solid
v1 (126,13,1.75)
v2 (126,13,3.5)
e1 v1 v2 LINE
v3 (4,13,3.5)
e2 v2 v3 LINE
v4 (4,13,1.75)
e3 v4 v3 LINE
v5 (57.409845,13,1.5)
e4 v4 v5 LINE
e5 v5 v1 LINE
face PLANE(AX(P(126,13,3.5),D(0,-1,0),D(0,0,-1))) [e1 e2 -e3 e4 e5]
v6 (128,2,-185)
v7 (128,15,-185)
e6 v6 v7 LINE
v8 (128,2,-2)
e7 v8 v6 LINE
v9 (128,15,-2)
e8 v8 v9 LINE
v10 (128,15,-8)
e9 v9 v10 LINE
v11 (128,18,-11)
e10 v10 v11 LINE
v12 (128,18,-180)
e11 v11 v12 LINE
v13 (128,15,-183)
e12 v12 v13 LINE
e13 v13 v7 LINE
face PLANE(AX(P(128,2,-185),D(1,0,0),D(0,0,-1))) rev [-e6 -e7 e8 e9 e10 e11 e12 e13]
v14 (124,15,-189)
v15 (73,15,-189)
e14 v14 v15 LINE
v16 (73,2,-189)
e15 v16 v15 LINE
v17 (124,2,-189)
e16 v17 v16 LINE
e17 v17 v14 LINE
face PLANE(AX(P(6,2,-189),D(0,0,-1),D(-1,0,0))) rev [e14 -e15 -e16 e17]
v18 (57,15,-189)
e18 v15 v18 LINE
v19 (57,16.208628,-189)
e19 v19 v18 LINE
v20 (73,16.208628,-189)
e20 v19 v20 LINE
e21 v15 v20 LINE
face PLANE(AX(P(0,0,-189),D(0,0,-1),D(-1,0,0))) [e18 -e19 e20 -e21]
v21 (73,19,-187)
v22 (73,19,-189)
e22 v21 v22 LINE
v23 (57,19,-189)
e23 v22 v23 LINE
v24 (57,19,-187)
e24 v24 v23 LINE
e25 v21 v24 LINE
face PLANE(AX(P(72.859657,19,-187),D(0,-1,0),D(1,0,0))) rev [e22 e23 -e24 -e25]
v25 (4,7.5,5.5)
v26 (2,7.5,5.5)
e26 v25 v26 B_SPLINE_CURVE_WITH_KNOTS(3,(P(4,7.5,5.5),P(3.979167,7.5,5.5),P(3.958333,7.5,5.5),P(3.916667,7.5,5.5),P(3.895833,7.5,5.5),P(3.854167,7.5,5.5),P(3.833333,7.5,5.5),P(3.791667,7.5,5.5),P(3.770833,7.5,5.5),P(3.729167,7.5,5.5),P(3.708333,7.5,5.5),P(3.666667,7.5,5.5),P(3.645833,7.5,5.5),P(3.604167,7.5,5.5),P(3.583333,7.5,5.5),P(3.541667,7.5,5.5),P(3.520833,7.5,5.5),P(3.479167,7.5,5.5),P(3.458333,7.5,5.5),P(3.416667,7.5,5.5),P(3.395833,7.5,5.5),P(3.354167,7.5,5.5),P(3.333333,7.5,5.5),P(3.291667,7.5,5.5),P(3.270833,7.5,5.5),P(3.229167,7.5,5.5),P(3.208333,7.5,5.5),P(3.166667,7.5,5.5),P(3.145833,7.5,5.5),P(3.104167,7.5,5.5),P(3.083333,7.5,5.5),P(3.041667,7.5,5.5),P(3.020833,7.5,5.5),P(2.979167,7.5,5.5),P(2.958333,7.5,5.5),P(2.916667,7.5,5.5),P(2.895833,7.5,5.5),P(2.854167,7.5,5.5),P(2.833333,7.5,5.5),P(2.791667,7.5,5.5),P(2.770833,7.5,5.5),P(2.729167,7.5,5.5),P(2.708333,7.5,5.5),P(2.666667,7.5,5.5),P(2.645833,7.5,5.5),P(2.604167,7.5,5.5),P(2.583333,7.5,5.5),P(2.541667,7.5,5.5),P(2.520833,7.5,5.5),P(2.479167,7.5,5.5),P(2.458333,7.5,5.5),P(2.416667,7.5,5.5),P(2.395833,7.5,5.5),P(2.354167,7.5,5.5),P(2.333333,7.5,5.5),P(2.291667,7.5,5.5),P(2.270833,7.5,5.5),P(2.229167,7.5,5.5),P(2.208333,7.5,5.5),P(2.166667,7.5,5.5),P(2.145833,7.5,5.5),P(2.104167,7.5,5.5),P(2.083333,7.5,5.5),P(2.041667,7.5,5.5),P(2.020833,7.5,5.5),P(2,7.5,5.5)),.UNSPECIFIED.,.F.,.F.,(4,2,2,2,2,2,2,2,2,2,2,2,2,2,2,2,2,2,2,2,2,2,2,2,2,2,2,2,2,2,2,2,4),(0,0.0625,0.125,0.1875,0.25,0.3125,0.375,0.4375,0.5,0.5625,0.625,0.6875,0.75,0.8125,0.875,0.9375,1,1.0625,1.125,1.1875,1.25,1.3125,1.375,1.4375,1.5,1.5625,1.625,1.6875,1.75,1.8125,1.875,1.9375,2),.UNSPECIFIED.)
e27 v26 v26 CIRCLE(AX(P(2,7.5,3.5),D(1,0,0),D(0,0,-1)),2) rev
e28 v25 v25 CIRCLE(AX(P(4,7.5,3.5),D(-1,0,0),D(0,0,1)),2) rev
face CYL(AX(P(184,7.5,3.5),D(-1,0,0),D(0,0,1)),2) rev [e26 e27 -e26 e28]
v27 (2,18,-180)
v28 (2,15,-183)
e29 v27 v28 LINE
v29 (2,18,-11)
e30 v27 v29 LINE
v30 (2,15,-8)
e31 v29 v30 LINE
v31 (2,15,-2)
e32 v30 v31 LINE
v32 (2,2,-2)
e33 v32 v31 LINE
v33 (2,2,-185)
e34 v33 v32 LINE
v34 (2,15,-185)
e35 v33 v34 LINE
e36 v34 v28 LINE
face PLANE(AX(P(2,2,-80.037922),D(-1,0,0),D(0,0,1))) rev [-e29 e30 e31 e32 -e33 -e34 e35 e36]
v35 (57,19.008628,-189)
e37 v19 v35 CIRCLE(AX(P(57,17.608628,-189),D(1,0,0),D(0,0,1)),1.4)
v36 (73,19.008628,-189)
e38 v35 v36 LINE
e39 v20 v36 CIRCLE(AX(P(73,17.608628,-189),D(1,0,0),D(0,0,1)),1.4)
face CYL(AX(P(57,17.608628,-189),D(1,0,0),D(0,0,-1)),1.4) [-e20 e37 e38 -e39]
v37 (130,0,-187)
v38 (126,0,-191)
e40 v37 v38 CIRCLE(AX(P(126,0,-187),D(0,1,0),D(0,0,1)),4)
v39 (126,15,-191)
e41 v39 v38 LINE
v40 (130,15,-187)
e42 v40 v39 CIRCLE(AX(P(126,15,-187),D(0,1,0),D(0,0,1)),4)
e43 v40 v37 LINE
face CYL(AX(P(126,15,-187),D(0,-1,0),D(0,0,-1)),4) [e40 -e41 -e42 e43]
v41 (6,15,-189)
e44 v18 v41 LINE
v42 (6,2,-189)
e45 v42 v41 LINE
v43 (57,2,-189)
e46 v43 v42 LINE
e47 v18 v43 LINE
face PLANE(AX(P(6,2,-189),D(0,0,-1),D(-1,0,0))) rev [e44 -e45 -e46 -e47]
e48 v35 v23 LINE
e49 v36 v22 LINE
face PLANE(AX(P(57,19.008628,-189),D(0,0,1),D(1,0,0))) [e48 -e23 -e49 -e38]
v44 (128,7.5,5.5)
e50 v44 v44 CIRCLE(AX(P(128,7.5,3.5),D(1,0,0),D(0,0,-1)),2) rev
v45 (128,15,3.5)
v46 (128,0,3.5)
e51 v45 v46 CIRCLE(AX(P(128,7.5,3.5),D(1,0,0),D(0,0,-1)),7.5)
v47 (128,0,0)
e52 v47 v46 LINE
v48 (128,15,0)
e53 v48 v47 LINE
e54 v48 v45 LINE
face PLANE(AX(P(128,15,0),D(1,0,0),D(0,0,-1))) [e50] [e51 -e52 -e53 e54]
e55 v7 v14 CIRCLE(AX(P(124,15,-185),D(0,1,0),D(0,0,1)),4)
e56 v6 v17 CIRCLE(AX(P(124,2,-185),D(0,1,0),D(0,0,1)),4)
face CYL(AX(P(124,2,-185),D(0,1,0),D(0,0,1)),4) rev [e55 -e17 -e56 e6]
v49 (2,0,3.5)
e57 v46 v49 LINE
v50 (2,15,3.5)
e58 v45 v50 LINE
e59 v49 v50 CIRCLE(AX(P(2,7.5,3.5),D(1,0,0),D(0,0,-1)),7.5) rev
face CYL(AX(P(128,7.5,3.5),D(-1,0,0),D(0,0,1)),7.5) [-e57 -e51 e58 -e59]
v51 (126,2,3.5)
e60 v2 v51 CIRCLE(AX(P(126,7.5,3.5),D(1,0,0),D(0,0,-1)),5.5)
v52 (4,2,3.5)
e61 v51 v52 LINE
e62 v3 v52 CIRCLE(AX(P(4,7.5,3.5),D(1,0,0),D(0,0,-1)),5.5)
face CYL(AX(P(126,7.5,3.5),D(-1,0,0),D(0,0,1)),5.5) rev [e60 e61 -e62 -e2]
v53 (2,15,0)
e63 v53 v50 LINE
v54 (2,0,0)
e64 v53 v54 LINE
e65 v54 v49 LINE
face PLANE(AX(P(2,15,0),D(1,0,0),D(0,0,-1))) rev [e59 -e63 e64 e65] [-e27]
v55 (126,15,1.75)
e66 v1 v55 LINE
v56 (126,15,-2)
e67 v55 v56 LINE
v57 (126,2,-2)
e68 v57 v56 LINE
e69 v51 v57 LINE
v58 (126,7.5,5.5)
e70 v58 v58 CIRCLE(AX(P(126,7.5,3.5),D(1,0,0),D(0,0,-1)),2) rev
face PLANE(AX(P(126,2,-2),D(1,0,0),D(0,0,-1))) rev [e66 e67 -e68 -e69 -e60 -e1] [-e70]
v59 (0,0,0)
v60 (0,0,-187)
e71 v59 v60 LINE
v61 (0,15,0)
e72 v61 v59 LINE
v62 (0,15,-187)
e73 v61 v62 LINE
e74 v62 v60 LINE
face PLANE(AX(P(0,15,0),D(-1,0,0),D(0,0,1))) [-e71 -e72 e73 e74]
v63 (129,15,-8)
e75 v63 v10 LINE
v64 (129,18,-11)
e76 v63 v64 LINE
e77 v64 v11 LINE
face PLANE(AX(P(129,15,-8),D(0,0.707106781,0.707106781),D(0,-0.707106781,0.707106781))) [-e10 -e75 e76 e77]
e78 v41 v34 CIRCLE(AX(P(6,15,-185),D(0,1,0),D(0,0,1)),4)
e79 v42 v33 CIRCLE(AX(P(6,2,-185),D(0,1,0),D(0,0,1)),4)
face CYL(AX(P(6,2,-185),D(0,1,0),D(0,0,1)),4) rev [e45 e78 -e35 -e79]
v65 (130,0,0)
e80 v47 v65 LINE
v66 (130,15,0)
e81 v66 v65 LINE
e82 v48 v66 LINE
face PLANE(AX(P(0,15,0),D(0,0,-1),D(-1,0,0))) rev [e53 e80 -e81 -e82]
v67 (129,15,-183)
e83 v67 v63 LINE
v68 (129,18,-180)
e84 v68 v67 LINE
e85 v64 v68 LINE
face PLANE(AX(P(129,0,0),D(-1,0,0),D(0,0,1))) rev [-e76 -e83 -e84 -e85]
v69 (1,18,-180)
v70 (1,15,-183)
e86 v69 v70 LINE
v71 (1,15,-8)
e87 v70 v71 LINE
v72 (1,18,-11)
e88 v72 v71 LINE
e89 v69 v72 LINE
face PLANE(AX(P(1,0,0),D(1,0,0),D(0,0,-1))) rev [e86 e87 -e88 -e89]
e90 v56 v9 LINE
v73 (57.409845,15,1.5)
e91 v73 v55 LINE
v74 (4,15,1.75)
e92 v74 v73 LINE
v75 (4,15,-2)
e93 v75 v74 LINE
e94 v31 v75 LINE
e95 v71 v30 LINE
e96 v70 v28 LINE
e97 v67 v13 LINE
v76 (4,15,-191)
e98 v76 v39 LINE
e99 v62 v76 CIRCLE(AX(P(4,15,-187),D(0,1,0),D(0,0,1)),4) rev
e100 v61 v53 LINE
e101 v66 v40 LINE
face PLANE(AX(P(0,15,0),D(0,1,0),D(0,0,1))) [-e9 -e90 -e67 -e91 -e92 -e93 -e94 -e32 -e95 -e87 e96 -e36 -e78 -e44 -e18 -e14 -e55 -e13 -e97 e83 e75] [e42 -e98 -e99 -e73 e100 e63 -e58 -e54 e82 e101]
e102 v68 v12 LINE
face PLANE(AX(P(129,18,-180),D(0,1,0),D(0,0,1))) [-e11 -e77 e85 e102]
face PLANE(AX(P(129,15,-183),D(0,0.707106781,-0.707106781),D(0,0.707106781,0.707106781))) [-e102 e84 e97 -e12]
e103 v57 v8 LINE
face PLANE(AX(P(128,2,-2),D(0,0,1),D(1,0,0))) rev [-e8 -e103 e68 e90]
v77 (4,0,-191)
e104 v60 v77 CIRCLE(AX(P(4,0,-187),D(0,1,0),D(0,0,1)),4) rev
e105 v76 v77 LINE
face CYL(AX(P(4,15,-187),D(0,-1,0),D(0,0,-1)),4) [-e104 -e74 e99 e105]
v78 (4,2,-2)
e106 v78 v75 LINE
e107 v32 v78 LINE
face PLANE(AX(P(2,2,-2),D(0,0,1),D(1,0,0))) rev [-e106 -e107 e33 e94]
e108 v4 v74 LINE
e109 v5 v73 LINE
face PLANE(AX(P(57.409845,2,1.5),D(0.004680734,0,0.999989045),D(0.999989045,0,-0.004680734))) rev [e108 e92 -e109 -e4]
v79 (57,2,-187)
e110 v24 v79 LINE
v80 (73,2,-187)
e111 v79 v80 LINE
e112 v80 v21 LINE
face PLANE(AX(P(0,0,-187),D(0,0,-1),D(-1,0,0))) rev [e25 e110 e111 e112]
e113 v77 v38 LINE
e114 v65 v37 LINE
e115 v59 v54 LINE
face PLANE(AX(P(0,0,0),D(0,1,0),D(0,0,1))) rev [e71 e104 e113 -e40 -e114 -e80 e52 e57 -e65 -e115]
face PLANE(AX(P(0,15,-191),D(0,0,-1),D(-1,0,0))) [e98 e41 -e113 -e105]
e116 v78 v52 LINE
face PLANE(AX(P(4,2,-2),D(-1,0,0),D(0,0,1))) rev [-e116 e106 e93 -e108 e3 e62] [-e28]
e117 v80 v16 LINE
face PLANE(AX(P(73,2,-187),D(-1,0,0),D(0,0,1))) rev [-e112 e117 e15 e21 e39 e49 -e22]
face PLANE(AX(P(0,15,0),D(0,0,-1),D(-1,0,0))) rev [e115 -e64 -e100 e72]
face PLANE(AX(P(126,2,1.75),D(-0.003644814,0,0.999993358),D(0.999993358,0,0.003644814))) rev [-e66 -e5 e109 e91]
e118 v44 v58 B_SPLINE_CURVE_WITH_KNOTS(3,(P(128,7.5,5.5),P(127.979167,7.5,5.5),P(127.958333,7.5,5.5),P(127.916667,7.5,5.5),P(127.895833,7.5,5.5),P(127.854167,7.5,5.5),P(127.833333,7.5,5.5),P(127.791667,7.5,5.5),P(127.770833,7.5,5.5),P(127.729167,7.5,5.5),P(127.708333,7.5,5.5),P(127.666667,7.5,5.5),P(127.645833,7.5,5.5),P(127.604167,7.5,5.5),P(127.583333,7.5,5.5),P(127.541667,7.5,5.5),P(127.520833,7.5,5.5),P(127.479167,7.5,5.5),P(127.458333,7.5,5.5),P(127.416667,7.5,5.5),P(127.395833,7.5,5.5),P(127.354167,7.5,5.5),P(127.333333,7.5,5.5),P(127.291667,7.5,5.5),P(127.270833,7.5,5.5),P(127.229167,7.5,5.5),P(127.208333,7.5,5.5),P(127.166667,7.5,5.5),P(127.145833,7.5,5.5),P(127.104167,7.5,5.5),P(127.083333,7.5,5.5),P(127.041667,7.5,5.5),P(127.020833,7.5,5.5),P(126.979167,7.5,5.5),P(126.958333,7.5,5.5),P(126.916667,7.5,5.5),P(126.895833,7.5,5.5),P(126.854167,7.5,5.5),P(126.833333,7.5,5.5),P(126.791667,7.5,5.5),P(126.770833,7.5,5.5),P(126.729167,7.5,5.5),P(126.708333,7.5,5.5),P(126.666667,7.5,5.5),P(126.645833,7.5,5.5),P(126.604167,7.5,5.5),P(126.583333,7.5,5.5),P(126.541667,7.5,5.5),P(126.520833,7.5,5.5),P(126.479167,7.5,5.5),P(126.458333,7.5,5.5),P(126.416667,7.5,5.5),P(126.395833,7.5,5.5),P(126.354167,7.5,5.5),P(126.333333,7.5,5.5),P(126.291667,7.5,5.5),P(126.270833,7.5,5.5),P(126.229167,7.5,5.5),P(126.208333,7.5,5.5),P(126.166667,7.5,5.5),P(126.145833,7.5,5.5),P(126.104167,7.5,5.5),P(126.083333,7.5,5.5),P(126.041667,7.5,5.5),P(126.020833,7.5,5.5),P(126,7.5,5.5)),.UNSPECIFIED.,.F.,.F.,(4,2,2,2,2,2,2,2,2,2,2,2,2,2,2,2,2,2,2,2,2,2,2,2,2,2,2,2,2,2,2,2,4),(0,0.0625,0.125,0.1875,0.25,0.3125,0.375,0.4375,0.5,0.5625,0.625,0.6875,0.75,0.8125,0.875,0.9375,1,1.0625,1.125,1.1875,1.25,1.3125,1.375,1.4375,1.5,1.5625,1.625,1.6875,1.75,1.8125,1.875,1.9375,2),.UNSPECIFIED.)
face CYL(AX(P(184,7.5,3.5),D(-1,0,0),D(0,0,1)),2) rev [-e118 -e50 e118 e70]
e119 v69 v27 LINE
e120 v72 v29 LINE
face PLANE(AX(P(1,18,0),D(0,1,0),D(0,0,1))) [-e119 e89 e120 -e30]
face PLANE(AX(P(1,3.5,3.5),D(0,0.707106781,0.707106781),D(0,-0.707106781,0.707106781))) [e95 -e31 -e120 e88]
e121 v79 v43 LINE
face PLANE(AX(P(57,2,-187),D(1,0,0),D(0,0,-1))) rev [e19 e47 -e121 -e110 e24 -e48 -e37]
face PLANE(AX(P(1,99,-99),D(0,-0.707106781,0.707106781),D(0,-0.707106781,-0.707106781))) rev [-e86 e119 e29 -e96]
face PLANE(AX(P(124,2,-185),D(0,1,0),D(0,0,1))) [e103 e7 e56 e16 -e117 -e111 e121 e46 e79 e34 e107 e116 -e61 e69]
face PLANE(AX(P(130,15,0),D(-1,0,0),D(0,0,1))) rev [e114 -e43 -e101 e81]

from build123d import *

# Parameters (mm, degrees)
SALIENTE_EXTRUIR2_DEPTH    = 15
CORTAR_EXTRUIR5_START      = -126
CORTAR_EXTRUIR5_DEPTH      = 126
CORTAR_EXTRUIR6_DEPTH      = 13
SALIENTE_EXTRUIR3_DEPTH    = 1
SALIENTE_EXTRUIR4_DEPTH    = 1
CORTAR_EXTRUIR7_DEPTH      = 122
SALIENTE_EXTRUIR5_DEPTH    = 2
SALIENTE_EXTRUIR6_DEPTH    = 16
CORTAR_EXTRUIR8_DEPTH      = 180
CORTAR_EXTRUIR8_DEPTH_BACK = 180
CROQUIS12_R                = 2


# Read off the part's stored shape, not the designer's step: Cortar-Extruir5
with BuildPart() as part:
    # Croquis1 → Saliente-Extruir2 (new body)
    with BuildSketch(Plane(origin=(0, 0, 0), x_dir=(1, 0, 0), z_dir=(0, 1, 0))):
        with BuildLine():
            Line((0, 0), (2, 0))
            Line((2, 0), (2, -11))
            Line((2, -11), (128, -11))
            Line((128, -11), (128, 0))
            Line((128, 0), (130, 0))
            Line((130, 0), (130, 187))
            ThreePointArc((130, 187), (128.828427125, 189.828427125), (126, 191))
            Line((126, 191), (4, 191))
            ThreePointArc((4, 191), (1.171572875, 189.828427125), (0, 187))
            Line((0, 187), (0, 0))
        make_face()
    extrude(amount=SALIENTE_EXTRUIR2_DEPTH)

    # Cortar-Extruir5 outline → Cortar-Extruir5 (cut)
    with BuildSketch(Plane(origin=(128, 0, 0), x_dir=(0, 0, -1), z_dir=(1, 0, 0)).offset(CORTAR_EXTRUIR5_START)):
        with BuildLine():
            Line((-11, 0), (-3.5, 0))
            ThreePointArc((-3.5, 0), (-8.803300859, 2.196699141), (-11, 7.5))
            Line((-11, 7.5), (-11, 0))
        make_face()
        with BuildLine():
            Line((-11, 15), (-11, 7.5))
            ThreePointArc((-11, 7.5), (-8.803300859, 12.803300859), (-3.5, 15))
            Line((-3.5, 15), (-11, 15))
        make_face()
    extrude(amount=CORTAR_EXTRUIR5_DEPTH, mode=Mode.SUBTRACT)

    # Croquis3 → Cortar-Extruir6 (cut)
    with BuildSketch(Plane(origin=(0, 15, 0), x_dir=(1, 0, 0), z_dir=(0, 1, 0))):
        with BuildLine():
            Line((2, 80.037921952), (2, 185))
            ThreePointArc((2, 185), (3.171572875, 187.828427125), (6, 189))
            Line((6, 189), (124, 189))
            ThreePointArc((124, 189), (126.828427125, 187.828427125), (128, 185))
            Line((128, 185), (128, 95.850744251))
            Line((128, 95.850744251), (128, 2))
            Line((128, 2), (126, 2))
            Line((126, 2), (126, -1.75))
            Line((126, -1.75), (57.409845297, -1.5))
            Line((57.409845297, -1.5), (4, -1.75))
            Line((4, -1.75), (4, 2))
            Line((4, 2), (2, 2))
            Line((2, 2), (2, 80.037921952))
        make_face()
    extrude(amount=-CORTAR_EXTRUIR6_DEPTH, mode=Mode.SUBTRACT)

    # Croquis6 → Saliente-Extruir3 (add)
    with BuildSketch(Plane.ZY.offset(-128)):
        Polygon((-183, 15), (-8, 15), (-11, 18), (-180, 18), align=None)
    extrude(amount=-SALIENTE_EXTRUIR3_DEPTH)

    # Croquis7 → Saliente-Extruir4 (add)
    with BuildSketch(Plane(origin=(2, 0, 0), x_dir=(0, 0, -1), z_dir=(1, 0, 0))):
        Polygon((183, 15), (180, 18), (11, 18), (8, 15), align=None)
    extrude(amount=-SALIENTE_EXTRUIR4_DEPTH)

    # Croquis8 → Cortar-Extruir7 (cut)
    with BuildSketch(Plane(origin=(4, 0, 0), x_dir=(0, 0, -1), z_dir=(1, 0, 0))):
        with BuildLine():
            Line((-3.5, 13), (5.32233659, 13))
            Line((5.32233659, 13), (5.32233659, 2))
            Line((5.32233659, 2), (-3.5, 2))
            ThreePointArc((-3.5, 2), (-9, 7.5), (-3.5, 13))
        make_face()
    extrude(amount=CORTAR_EXTRUIR7_DEPTH, mode=Mode.SUBTRACT)

    # Croquis10 → Saliente-Extruir5 (add)
    with BuildSketch(Plane.XY.offset(-189)):
        Polygon((65, 2), (73, 2), (73, 19), (72.859656946, 19), (57, 19), (57, 2), align=None)
    extrude(amount=SALIENTE_EXTRUIR5_DEPTH)

    # Croquis11 → Saliente-Extruir6 (add)
    with BuildSketch(Plane(origin=(73, 0, 0), x_dir=(0, 0, -1), z_dir=(1, 0, 0))):
        with BuildLine():
            Line((189, 19.00862759), (189, 16.20862759))
            ThreePointArc((189, 16.20862759), (190.4, 17.60862759), (189, 19.00862759))
        make_face()
    extrude(amount=-SALIENTE_EXTRUIR6_DEPTH)

    # Croquis12 → Cortar-Extruir8 (cut, two sides: drawn at the far end of the back side and taken through both)
    with BuildSketch(Plane(origin=(4, 0, 0), x_dir=(0, 0, -1), z_dir=(1, 0, 0)).offset(-CORTAR_EXTRUIR8_DEPTH_BACK)):
        with Locations(Location((-3.5, 7.5, 0), (0, 0, 180))):
            Circle(CROQUIS12_R)
    extrude(amount=CORTAR_EXTRUIR8_DEPTH + CORTAR_EXTRUIR8_DEPTH_BACK, mode=Mode.SUBTRACT)


solid = part.part
